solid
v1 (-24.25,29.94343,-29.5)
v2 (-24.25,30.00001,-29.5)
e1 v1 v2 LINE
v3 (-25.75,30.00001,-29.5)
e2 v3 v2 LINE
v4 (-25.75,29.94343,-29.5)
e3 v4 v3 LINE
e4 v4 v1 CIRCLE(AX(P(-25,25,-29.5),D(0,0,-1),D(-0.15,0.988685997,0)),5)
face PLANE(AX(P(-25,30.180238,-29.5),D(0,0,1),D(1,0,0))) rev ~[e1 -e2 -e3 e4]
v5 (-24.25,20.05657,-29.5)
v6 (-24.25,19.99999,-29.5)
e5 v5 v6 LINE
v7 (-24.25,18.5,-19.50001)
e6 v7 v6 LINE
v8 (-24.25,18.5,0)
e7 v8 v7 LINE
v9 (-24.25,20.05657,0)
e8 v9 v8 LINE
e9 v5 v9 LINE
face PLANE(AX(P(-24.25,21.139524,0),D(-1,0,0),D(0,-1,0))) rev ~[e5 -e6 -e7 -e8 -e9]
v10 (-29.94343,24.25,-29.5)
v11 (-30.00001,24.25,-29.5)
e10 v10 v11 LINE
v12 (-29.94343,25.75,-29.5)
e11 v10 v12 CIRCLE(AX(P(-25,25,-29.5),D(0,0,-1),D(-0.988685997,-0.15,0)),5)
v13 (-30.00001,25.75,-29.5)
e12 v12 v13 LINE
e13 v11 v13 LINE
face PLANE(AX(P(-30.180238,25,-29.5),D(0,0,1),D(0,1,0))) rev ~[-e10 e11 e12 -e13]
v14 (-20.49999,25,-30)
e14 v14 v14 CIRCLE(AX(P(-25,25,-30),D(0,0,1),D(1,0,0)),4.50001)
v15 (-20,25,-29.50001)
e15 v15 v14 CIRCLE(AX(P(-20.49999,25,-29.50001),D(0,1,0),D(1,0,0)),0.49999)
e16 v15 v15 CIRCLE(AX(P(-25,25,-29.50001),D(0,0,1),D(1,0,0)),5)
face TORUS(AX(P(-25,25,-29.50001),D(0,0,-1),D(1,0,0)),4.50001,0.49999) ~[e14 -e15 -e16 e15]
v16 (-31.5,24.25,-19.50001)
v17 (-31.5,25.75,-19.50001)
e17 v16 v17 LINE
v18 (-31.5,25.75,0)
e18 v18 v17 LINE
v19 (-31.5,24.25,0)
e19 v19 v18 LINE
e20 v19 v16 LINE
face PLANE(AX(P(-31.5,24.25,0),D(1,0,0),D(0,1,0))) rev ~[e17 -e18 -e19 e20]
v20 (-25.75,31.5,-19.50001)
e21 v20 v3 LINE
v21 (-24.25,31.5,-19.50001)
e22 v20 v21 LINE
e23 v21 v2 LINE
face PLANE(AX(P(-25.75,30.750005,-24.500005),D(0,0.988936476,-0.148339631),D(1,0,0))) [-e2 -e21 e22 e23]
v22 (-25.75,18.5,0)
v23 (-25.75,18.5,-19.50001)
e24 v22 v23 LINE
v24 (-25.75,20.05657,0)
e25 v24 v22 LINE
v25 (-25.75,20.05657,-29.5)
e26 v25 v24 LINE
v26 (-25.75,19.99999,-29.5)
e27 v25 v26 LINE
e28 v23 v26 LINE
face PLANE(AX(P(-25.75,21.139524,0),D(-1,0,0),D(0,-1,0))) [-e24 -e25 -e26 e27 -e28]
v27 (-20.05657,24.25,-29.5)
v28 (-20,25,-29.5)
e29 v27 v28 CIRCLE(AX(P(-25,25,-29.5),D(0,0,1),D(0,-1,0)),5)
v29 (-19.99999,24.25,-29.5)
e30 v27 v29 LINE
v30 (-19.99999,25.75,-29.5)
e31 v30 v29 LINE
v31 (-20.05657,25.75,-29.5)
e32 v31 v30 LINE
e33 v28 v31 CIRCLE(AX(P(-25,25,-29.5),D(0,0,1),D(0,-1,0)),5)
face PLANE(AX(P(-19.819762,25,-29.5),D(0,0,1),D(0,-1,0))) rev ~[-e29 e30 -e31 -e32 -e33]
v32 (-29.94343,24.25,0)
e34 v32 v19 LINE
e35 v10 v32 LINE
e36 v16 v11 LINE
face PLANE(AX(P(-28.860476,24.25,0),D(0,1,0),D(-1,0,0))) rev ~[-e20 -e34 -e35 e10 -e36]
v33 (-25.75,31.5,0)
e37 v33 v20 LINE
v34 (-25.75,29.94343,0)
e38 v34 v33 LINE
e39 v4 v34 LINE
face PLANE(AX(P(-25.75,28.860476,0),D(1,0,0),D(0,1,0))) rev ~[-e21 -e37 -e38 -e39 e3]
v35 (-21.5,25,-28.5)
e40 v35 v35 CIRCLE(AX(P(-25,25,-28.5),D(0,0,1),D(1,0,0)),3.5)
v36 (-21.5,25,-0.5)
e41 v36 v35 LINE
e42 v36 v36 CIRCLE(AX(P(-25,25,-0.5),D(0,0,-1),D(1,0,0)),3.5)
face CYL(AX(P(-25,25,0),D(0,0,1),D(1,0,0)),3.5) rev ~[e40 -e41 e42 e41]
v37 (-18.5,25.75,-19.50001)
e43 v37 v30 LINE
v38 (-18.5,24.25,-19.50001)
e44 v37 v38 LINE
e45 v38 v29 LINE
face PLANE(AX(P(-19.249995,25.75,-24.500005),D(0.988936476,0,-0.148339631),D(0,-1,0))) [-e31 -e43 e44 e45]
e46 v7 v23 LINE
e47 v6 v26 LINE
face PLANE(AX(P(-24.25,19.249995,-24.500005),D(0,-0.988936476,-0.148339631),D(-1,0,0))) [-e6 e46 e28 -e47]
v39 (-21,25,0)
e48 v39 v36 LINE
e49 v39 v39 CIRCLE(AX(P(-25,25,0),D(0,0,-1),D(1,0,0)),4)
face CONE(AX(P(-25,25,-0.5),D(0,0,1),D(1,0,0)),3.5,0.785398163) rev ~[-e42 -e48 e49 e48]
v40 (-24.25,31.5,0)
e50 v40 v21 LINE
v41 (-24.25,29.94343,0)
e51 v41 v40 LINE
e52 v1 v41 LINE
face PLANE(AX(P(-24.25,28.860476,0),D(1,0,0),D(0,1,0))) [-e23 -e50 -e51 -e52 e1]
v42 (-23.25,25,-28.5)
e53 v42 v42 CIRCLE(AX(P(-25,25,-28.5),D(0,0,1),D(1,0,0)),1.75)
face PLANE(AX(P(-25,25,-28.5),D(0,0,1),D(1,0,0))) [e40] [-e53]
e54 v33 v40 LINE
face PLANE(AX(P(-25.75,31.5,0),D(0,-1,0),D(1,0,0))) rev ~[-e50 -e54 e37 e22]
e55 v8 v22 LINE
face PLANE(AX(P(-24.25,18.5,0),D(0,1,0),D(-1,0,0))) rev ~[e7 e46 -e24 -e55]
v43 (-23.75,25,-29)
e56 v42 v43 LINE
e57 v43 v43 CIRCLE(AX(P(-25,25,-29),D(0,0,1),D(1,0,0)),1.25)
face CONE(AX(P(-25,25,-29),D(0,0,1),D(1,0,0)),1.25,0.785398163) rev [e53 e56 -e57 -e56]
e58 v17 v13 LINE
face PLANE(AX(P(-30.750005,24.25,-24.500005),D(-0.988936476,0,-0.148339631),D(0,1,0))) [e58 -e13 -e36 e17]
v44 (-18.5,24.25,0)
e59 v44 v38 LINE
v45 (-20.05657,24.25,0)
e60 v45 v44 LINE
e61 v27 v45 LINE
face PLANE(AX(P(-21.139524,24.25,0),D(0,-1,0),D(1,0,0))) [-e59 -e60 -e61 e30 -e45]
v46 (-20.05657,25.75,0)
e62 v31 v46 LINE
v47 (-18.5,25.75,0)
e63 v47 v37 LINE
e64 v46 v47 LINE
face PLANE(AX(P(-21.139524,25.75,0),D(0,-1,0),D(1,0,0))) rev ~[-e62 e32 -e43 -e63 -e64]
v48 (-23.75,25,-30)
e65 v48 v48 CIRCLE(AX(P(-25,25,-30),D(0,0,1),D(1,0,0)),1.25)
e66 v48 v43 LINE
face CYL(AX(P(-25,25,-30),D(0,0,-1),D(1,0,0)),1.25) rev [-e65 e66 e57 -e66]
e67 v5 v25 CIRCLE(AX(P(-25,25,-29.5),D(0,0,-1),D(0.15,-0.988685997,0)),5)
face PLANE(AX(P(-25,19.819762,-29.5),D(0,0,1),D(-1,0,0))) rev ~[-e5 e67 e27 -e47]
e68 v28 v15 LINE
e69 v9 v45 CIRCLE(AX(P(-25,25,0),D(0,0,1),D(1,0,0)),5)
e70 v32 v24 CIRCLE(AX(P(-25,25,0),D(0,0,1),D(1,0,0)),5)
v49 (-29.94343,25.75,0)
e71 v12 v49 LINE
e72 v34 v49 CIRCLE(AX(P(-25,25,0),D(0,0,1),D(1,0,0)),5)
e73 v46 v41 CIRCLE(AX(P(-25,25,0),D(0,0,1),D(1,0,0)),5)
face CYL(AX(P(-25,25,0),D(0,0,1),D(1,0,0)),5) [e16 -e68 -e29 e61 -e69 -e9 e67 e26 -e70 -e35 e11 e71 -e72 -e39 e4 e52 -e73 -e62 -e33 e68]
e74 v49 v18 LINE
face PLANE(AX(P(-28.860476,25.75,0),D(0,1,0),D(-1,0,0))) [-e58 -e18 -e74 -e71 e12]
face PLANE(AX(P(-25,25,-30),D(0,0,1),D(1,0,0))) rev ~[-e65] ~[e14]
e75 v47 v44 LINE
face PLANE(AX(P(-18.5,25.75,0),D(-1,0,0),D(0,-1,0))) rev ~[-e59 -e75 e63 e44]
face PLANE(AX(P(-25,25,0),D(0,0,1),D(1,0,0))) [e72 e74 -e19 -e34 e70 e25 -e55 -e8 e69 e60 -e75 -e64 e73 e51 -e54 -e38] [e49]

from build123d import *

# Parameters (mm, degrees)
F1_R        = 5
F1_R_2      = 3.5
F2_DEPTH    = 30
F4_W        = 1.5
F4_H        = 2.639524132
F5_DEPTH    = 29.5
F6_COUNT    = 4
F8_R        = 3.5
F8_R_2      = 1.25
F9_DEPTH    = 1.5
F10_SIZE2   = 1.49999
F10_SIZE    = 9.99999
F10_2_SIZE2 = 1.49999
F10_2_SIZE  = 9.99999
F10_3_SIZE2 = 1.49999
F10_3_SIZE  = 9.99999
F10_4_SIZE2 = 1.49999
F10_4_SIZE  = 9.99999
F11_SIZE    = 0.5
F12_R       = 0.49999


# Not quite as in the source:
# - a fillet or chamfer is up to 0.001 mm smaller than in the source, because OpenCascade refuses the exact size


with BuildPart() as f2:
    # F1 (on offset) → F2 (new body)
    with BuildSketch(Plane.XY):
        with Locations((-25, 25)):
            Circle(F1_R)
        with Locations((-25, 25)):
            Circle(F1_R_2, mode=Mode.SUBTRACT)
    extrude(amount=-F2_DEPTH)

    # F4 (on offset) → F5 (join)
    with BuildSketch(Plane.XY):
        with Locations((-25, 30.180237934)):
            Rectangle(F4_W, F4_H)
    extrude(amount=-F5_DEPTH)

    # F6: F2 ×4 about axis
    f6_axis = Axis((-25, 25, 0), (0, 0, 1))


with BuildPart() as f2_1:
    add(f2.part)
    for i in range(1, F6_COUNT):
        add(f2.part.rotate(f6_axis, i * 360 / F6_COUNT))

    # F8 (on offset) → F9 (join)
    with BuildSketch(Plane.XY.offset(-30)):
        with Locations((-25, 25)):
            Circle(F8_R)
        with Locations((-25, 25)):
            Circle(F8_R_2, mode=Mode.SUBTRACT)
    extrude(amount=F9_DEPTH)

    # F10 (size 10 and 1.5 in the source; OpenCascade refuses exactly that, so slightly less here)
    f10_edges = [f2_1.edges().sort_by_distance(p)[0] for p in [
        (-25, 18.5, -29.5),
    ]]
    f10_side = f2_1.faces().sort_by_distance((-25, 18.5, -14.75))[0]
    chamfer(f10_edges, length=F10_SIZE, length2=F10_SIZE2, reference=f10_side)

    # F10#2 (size 10 and 1.5 in the source; OpenCascade refuses exactly that, so slightly less here)
    f10_2_edges = [f2_1.edges().sort_by_distance(p)[0] for p in [
        (-18.5, 25, -29.5),
    ]]
    f10_2_side = f2_1.faces().sort_by_distance((-18.5, 25, -14.75))[0]
    chamfer(f10_2_edges, length=F10_2_SIZE, length2=F10_2_SIZE2, reference=f10_2_side)

    # F10#3 (size 10 and 1.5 in the source; OpenCascade refuses exactly that, so slightly less here)
    f10_3_edges = [f2_1.edges().sort_by_distance(p)[0] for p in [
        (-25, 31.5, -29.5),
    ]]
    f10_3_side = f2_1.faces().sort_by_distance((-25, 31.5, -14.75))[0]
    chamfer(f10_3_edges, length=F10_3_SIZE, length2=F10_3_SIZE2, reference=f10_3_side)

    # F10#4 (size 10 and 1.5 in the source; OpenCascade refuses exactly that, so slightly less here)
    f10_4_edges = [f2_1.edges().sort_by_distance(p)[0] for p in [
        (-31.5, 25, -29.5),
    ]]
    f10_4_side = f2_1.faces().sort_by_distance((-31.5, 25, -14.75))[0]
    chamfer(f10_4_edges, length=F10_4_SIZE, length2=F10_4_SIZE2, reference=f10_4_side)

    # F11
    f11_edges = [f2_1.edges().sort_by_distance(p)[0] for p in [
        (-28.5, 25, 0),
        (-26.25, 25, -28.5),
    ]]
    chamfer(f11_edges, length=F11_SIZE)

    # F12 (radius 0.5 in the source; OpenCascade refuses exactly that, so slightly less here)
    f12_edges = [f2_1.edges().sort_by_distance(p)[0] for p in [
        (-30, 25, -30),
    ]]
    fillet(f12_edges, radius=F12_R)


solid = f2_1.part
